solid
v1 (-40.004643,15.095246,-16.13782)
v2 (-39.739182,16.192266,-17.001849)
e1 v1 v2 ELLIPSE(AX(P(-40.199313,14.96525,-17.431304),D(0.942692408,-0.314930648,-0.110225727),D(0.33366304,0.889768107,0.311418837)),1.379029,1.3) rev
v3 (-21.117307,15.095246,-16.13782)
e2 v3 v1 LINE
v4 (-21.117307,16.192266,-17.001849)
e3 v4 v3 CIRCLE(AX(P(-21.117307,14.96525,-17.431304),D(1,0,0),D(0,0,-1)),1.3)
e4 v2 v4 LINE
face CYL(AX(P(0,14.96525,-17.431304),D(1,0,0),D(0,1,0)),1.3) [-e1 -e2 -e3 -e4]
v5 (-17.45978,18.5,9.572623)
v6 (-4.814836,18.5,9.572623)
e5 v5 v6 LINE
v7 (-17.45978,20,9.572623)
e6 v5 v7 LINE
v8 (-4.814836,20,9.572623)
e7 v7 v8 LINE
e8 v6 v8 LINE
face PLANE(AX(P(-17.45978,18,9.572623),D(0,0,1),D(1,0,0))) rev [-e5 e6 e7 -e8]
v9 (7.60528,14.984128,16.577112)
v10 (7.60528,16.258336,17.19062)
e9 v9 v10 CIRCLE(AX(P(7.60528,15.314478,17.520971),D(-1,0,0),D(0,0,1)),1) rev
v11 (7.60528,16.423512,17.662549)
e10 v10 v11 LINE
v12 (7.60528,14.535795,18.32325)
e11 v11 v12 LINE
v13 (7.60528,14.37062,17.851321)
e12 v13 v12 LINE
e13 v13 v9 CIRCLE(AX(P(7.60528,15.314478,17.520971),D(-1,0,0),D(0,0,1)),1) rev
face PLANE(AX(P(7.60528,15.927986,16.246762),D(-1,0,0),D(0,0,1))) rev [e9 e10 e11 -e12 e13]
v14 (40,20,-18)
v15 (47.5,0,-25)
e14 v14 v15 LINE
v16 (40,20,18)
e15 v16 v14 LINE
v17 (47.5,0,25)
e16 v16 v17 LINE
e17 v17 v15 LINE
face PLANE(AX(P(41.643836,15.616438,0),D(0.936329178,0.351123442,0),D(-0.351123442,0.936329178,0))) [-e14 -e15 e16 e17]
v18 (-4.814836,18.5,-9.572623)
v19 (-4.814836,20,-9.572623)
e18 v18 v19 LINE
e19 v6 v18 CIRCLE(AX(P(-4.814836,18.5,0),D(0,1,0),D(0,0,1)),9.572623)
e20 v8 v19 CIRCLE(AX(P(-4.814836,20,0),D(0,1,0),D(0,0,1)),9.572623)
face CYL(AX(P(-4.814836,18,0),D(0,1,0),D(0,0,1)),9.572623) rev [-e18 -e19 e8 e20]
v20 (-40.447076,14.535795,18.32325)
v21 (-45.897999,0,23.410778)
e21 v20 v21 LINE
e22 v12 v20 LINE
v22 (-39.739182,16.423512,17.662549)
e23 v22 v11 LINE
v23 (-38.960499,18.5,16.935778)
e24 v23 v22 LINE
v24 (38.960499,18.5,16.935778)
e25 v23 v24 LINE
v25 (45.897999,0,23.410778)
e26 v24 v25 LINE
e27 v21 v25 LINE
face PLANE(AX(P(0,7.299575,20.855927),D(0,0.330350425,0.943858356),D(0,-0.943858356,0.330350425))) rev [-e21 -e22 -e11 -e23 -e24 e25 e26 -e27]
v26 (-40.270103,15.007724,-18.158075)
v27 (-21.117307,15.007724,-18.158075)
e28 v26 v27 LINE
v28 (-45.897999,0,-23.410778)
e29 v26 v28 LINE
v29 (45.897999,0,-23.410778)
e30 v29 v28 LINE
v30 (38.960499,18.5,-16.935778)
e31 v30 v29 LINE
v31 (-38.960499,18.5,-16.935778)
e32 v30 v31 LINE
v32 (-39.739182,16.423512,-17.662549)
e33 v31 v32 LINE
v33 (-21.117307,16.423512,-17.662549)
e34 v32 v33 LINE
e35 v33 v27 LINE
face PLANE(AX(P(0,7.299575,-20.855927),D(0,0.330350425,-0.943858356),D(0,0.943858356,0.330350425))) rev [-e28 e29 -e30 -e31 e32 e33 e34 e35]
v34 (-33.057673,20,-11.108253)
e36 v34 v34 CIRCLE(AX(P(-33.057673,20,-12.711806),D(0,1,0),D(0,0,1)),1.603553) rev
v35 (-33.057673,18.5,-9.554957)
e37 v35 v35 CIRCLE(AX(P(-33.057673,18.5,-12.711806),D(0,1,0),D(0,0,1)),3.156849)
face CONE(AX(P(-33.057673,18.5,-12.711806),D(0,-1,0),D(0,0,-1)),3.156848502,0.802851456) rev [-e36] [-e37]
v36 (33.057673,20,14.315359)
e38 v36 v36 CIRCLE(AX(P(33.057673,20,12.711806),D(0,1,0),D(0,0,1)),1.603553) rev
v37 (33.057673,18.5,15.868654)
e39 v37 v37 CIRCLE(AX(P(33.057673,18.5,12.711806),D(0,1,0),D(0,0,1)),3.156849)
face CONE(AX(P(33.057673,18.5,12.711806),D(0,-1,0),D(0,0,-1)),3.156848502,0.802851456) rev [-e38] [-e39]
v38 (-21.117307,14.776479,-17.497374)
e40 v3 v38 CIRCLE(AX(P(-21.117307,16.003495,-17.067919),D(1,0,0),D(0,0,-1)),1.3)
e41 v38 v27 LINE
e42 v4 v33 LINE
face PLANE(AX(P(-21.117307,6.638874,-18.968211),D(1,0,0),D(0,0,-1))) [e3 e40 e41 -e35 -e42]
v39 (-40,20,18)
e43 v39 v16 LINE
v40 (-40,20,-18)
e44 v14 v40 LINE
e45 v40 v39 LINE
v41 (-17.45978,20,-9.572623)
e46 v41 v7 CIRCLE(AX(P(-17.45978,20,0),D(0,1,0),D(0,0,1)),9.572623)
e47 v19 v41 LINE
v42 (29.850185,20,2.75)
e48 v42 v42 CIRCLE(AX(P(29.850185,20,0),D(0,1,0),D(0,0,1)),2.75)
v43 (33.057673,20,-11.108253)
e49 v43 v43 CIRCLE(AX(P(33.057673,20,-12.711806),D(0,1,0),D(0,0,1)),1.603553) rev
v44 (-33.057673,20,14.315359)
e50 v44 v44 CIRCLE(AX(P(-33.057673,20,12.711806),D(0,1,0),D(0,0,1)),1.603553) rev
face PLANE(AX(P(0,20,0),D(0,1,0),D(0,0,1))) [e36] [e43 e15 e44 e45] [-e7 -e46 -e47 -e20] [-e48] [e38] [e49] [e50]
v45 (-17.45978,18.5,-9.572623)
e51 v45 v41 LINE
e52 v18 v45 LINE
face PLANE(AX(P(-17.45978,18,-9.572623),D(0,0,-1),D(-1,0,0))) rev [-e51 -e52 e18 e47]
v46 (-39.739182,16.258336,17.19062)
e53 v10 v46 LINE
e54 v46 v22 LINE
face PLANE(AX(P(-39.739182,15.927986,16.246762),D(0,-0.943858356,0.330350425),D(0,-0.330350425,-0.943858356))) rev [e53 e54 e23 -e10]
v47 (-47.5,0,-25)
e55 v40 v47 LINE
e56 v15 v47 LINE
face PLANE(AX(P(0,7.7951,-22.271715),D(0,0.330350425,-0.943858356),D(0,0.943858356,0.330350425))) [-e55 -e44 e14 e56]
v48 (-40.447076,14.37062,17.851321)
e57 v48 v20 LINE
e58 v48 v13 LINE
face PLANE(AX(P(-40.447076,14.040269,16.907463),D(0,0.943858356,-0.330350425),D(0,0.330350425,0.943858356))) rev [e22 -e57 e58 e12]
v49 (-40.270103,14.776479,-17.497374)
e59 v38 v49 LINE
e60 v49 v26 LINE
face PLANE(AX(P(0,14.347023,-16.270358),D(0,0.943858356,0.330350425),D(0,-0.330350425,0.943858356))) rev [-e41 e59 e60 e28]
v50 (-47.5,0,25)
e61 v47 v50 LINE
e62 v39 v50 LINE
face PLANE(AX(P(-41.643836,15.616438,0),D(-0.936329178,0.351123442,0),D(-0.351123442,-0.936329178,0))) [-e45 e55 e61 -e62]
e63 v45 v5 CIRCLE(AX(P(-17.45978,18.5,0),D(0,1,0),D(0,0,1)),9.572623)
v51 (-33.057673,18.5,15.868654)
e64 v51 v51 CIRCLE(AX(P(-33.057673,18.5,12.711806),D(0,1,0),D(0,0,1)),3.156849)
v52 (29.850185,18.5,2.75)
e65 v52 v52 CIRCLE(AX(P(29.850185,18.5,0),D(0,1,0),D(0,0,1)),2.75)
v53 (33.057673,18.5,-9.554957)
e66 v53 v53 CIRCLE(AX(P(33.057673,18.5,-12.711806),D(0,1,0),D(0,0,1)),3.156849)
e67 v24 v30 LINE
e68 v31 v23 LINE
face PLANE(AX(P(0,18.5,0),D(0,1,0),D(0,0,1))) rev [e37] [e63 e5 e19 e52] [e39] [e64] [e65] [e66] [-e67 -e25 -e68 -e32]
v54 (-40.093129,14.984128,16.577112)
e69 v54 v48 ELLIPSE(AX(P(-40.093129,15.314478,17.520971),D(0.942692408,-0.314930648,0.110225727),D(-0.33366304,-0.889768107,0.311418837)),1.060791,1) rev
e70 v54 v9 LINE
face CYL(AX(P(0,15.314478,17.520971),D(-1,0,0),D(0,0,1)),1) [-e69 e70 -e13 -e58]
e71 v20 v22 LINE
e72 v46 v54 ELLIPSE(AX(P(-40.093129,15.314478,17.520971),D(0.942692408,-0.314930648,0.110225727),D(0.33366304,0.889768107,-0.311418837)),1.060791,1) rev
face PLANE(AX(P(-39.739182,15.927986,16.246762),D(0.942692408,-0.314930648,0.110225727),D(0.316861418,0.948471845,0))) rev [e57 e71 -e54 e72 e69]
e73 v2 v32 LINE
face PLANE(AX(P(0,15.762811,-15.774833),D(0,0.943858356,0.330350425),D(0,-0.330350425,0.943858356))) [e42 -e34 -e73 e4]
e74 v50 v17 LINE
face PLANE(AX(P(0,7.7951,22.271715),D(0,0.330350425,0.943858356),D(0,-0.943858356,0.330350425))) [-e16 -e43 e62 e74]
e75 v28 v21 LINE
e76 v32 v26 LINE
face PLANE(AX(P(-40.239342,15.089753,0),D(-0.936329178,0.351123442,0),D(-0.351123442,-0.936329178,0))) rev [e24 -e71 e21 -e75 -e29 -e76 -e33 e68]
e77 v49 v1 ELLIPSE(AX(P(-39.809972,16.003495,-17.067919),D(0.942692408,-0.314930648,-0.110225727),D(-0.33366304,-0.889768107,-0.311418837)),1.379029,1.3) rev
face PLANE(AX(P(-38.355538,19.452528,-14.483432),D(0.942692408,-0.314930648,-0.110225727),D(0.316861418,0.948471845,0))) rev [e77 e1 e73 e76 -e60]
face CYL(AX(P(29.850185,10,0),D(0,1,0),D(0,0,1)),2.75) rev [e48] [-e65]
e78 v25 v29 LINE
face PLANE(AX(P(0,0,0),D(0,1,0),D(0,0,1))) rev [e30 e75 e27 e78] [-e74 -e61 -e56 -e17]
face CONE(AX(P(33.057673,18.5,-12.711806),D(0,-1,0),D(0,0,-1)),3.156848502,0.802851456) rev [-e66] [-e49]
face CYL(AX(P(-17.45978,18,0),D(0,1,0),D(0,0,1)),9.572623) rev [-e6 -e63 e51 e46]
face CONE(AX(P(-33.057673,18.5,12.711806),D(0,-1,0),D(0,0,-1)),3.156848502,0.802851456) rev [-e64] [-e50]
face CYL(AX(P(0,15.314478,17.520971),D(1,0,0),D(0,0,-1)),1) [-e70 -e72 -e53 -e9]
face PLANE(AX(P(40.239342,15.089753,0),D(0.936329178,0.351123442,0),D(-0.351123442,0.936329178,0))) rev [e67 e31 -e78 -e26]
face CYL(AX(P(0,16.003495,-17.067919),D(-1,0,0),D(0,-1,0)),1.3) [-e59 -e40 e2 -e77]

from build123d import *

# Parameters (mm, degrees)
BO_ALTMA1_T                 = -1.5
KES_EKSTR_ZYON1_DEPTH       = 2
Y_KSEKLIK_EKSTR_ZYON4_DEPTH = 2
RADYUS1_R                   = 1.3
Y_KSEKLIK_EKSTR_ZYON5_DEPTH = 1.5
RADYUS2_R                   = 1
IZIM7_R                     = 2.75
KES_EKSTR_ZYON2_DEPTH       = 10
IZIM8_R                     = 1.5
KES_EKSTR_ZYON3_DEPTH       = 10
PAH1_SIZE                   = 1.656848502
PAH1_SIZE_2                 = 1.6


# Some blends are built 0.0001 mm under size
with BuildPart() as part:
    # Çizim3 → Loft4 section 0
    with BuildSketch(Plane(origin=(0, 20, 0), x_dir=(1, 0, 0), z_dir=(0, 1, 0))):
        with BuildLine():
            Line((-40, 18), (40, 18))
            Line((40, 18), (40, -18))
            Line((40, -18), (-40, -18))
            Line((-40, -18), (-40, 18))
        make_face()
    # Çizim1 → Loft4 section 1
    with BuildSketch(Plane(origin=(0, 0, 0), x_dir=(1, 0, 0), z_dir=(0, 1, 0))):
        with BuildLine():
            Line((-47.5, 25), (47.5, 25))
            Line((47.5, 25), (47.5, -25))
            Line((47.5, -25), (-47.5, -25))
            Line((-47.5, -25), (-47.5, 25))
        make_face()
    loft()

    # İç Boşaltma1
    bo_altma1_openings = [part.faces().sort_by_distance(p)[0] for p in [
        (0, 0, 0),
    ]]
    offset(amount=BO_ALTMA1_T, openings=bo_altma1_openings, kind=Kind.INTERSECTION)

    # Çizim4 → Kes-Ekstrüzyon1 (cut)
    with BuildSketch(Plane(origin=(0, 20, 0), x_dir=(1, 0, 0), z_dir=(0, 1, 0))):
        with BuildLine():
            Line((-17.459780383, 9.572622818), (-4.814835579, 9.572622818))
            ThreePointArc((-4.814835579, 9.572622818), (4.757787239, 0), (-4.814835579, -9.572622818))
            Line((-4.814835579, -9.572622818), (-17.459780383, -9.572622818))
            ThreePointArc((-17.459780383, -9.572622818), (-27.032403201, 0), (-17.459780383, 9.572622818))
        make_face()
    extrude(amount=-KES_EKSTR_ZYON1_DEPTH, mode=Mode.SUBTRACT)

    # Çizim5 → Yükseklik-Ekstrüzyon4 (add)
    with BuildSketch(Plane(origin=(0, 7.299574586, -20.855927387), x_dir=(1, 0, 0), z_dir=(0, -0.33035042472810616, 0.9438583563660173))):
        Polygon((-21.117307497, 9.666637975), (-39.739182442, 9.666637975), (-40.270102767, 8.166637975), (-21.117307497, 8.166637975), align=None)
    extrude(amount=Y_KSEKLIK_EKSTR_ZYON4_DEPTH)

    # Radyus1
    # the kernel refuses this fillet: 1.3 mm, written as the material it takes off along each edge
    with BuildSketch(Plane(origin=(-43.520102767, 14.347023232, -16.270358351), x_dir=(0, 0.3303504247281054, -0.9438583563660177), z_dir=(1, 0, 0))) as radyus1_piece_1_section:
        with BuildLine():
            CenterArc((RADYUS1_R, RADYUS1_R), RADYUS1_R, 180, 90)
            Line((0, RADYUS1_R), (0, 0))
            Line((0, 0), (RADYUS1_R, 0))
        make_face()
    radyus1_piece_1 = extrude(amount=25.65279527, mode=Mode.PRIVATE)
    radyus1_piece_1 = split(radyus1_piece_1, bisect_by=Plane(origin=(-39.107264326, 17.544066892, -15.459731471), z_dir=(0.942692407816345, -0.3149306484909819, -0.11022572697184368)), keep=Keep.TOP, mode=Mode.PRIVATE)
    add(radyus1_piece_1, mode=Mode.SUBTRACT)
    with BuildSketch(Plane(origin=(-17.867307497, 15.762810767, -15.774832714), x_dir=(0, 0.33035042472810655, -0.9438583563660172), z_dir=(-1, 0, 0))) as radyus1_piece_2_section:
        with BuildLine():
            CenterArc((RADYUS1_R, RADYUS1_R), RADYUS1_R, 180, 90)
            Line((0, RADYUS1_R), (0, 0))
            Line((0, 0), (RADYUS1_R, 0))
        make_face()
    radyus1_piece_2 = extrude(amount=25.121874944, mode=Mode.PRIVATE)
    radyus1_piece_2 = split(radyus1_piece_2, bisect_by=Plane(origin=(-38.800018931, 18.36295512, -15.171732463), z_dir=(0.942692407816345, -0.3149306484909819, -0.11022572697184368)), keep=Keep.TOP, mode=Mode.PRIVATE)
    add(radyus1_piece_2, mode=Mode.SUBTRACT)

    # Çizim6 → Yükseklik-Ekstrüzyon5 (add)
    with BuildSketch(Plane(origin=(0, 7.299574586, 20.855927387), x_dir=(-1, 0, 0), z_dir=(0, -0.3303504247281064, -0.9438583563660174))):
        Polygon((39.739182442, 9.666637975), (-7.605280372, 9.666637975), (-7.605280372, 7.666637975), (40.447076209, 7.666637975), align=None)
    extrude(amount=Y_KSEKLIK_EKSTR_ZYON5_DEPTH)

    # Radyus2
    radyus2_edges = [part.edges().sort_by_distance(p)[0] for p in [
        (-16.420897918, 14.040269266, 16.907462742),
        (-16.066951035, 15.927985979, 16.246761892),
    ]]
    fillet(radyus2_edges, radius=RADYUS2_R - 0.0001)  # a hair under: the kernel refuses the full size

    # Çizim7 → Kes-Ekstrüzyon2 (cut)
    with BuildSketch(Plane(origin=(0, 20, 0), x_dir=(1, 0, 0), z_dir=(0, 1, 0))):
        with Locations(Location((29.850184799, 0, 0), (0, 0, 270))):
            Circle(IZIM7_R)
    extrude(amount=-KES_EKSTR_ZYON2_DEPTH, mode=Mode.SUBTRACT)

    # Çizim8 → Kes-Ekstrüzyon3 (cut)
    with BuildSketch(Plane(origin=(0, 20, 0), x_dir=(1, 0, 0), z_dir=(0, 1, 0))):
        with Locations(Location((-33.057672649, 12.71180558, 0), (0, 0, 270))):
            Circle(IZIM8_R)
        with Locations(Location((33.057672649, 12.71180558, 0), (0, 0, 270))):
            Circle(IZIM8_R)
        with Locations(Location((33.057672649, -12.71180558, 0), (0, 0, 270))):
            Circle(IZIM8_R)
        with Locations(Location((-33.057672649, -12.71180558, 0), (0, 0, 270))):
            Circle(IZIM8_R)
    extrude(amount=-KES_EKSTR_ZYON3_DEPTH, mode=Mode.SUBTRACT)

    # Pah1
    # the kernel refuses this chamfer: 1.656848502, 1.6 mm, written as the material it takes off along each edge
    with BuildSketch(Plane(origin=(33.057672649, 18.5, -12.71180558), x_dir=(0, 0, 1), z_dir=(-1, 0, 0))) as pah1_piece_1:
        Polygon((1.5 + PAH1_SIZE, 0), (1.5, PAH1_SIZE_2), (1.5, 0), align=None)
    revolve(axis=Axis((33.057672649, 18.5, -12.71180558), (0, 1, 0)), mode=Mode.SUBTRACT)
    with BuildSketch(Plane(origin=(-33.057672649, 18.5, -12.71180558), x_dir=(0, 0, 1), z_dir=(-1, 0, 0))) as pah1_piece_2:
        Polygon((1.5 + PAH1_SIZE, 0), (1.5, PAH1_SIZE_2), (1.5, 0), align=None)
    revolve(axis=Axis((-33.057672649, 18.5, -12.71180558), (0, 1, 0)), mode=Mode.SUBTRACT)
    with BuildSketch(Plane(origin=(33.057672649, 18.5, 12.71180558), x_dir=(0, 0, 1), z_dir=(-1, 0, 0))) as pah1_piece_3:
        Polygon((1.5 + PAH1_SIZE, 0), (1.5, PAH1_SIZE_2), (1.5, 0), align=None)
    revolve(axis=Axis((33.057672649, 18.5, 12.71180558), (0, 1, 0)), mode=Mode.SUBTRACT)
    with BuildSketch(Plane(origin=(-33.057672649, 18.5, 12.71180558), x_dir=(0, 0, 1), z_dir=(-1, 0, 0))) as pah1_piece_4:
        Polygon((1.5 + PAH1_SIZE, 0), (1.5, PAH1_SIZE_2), (1.5, 0), align=None)
    revolve(axis=Axis((-33.057672649, 18.5, 12.71180558), (0, 1, 0)), mode=Mode.SUBTRACT)


solid = part.part
